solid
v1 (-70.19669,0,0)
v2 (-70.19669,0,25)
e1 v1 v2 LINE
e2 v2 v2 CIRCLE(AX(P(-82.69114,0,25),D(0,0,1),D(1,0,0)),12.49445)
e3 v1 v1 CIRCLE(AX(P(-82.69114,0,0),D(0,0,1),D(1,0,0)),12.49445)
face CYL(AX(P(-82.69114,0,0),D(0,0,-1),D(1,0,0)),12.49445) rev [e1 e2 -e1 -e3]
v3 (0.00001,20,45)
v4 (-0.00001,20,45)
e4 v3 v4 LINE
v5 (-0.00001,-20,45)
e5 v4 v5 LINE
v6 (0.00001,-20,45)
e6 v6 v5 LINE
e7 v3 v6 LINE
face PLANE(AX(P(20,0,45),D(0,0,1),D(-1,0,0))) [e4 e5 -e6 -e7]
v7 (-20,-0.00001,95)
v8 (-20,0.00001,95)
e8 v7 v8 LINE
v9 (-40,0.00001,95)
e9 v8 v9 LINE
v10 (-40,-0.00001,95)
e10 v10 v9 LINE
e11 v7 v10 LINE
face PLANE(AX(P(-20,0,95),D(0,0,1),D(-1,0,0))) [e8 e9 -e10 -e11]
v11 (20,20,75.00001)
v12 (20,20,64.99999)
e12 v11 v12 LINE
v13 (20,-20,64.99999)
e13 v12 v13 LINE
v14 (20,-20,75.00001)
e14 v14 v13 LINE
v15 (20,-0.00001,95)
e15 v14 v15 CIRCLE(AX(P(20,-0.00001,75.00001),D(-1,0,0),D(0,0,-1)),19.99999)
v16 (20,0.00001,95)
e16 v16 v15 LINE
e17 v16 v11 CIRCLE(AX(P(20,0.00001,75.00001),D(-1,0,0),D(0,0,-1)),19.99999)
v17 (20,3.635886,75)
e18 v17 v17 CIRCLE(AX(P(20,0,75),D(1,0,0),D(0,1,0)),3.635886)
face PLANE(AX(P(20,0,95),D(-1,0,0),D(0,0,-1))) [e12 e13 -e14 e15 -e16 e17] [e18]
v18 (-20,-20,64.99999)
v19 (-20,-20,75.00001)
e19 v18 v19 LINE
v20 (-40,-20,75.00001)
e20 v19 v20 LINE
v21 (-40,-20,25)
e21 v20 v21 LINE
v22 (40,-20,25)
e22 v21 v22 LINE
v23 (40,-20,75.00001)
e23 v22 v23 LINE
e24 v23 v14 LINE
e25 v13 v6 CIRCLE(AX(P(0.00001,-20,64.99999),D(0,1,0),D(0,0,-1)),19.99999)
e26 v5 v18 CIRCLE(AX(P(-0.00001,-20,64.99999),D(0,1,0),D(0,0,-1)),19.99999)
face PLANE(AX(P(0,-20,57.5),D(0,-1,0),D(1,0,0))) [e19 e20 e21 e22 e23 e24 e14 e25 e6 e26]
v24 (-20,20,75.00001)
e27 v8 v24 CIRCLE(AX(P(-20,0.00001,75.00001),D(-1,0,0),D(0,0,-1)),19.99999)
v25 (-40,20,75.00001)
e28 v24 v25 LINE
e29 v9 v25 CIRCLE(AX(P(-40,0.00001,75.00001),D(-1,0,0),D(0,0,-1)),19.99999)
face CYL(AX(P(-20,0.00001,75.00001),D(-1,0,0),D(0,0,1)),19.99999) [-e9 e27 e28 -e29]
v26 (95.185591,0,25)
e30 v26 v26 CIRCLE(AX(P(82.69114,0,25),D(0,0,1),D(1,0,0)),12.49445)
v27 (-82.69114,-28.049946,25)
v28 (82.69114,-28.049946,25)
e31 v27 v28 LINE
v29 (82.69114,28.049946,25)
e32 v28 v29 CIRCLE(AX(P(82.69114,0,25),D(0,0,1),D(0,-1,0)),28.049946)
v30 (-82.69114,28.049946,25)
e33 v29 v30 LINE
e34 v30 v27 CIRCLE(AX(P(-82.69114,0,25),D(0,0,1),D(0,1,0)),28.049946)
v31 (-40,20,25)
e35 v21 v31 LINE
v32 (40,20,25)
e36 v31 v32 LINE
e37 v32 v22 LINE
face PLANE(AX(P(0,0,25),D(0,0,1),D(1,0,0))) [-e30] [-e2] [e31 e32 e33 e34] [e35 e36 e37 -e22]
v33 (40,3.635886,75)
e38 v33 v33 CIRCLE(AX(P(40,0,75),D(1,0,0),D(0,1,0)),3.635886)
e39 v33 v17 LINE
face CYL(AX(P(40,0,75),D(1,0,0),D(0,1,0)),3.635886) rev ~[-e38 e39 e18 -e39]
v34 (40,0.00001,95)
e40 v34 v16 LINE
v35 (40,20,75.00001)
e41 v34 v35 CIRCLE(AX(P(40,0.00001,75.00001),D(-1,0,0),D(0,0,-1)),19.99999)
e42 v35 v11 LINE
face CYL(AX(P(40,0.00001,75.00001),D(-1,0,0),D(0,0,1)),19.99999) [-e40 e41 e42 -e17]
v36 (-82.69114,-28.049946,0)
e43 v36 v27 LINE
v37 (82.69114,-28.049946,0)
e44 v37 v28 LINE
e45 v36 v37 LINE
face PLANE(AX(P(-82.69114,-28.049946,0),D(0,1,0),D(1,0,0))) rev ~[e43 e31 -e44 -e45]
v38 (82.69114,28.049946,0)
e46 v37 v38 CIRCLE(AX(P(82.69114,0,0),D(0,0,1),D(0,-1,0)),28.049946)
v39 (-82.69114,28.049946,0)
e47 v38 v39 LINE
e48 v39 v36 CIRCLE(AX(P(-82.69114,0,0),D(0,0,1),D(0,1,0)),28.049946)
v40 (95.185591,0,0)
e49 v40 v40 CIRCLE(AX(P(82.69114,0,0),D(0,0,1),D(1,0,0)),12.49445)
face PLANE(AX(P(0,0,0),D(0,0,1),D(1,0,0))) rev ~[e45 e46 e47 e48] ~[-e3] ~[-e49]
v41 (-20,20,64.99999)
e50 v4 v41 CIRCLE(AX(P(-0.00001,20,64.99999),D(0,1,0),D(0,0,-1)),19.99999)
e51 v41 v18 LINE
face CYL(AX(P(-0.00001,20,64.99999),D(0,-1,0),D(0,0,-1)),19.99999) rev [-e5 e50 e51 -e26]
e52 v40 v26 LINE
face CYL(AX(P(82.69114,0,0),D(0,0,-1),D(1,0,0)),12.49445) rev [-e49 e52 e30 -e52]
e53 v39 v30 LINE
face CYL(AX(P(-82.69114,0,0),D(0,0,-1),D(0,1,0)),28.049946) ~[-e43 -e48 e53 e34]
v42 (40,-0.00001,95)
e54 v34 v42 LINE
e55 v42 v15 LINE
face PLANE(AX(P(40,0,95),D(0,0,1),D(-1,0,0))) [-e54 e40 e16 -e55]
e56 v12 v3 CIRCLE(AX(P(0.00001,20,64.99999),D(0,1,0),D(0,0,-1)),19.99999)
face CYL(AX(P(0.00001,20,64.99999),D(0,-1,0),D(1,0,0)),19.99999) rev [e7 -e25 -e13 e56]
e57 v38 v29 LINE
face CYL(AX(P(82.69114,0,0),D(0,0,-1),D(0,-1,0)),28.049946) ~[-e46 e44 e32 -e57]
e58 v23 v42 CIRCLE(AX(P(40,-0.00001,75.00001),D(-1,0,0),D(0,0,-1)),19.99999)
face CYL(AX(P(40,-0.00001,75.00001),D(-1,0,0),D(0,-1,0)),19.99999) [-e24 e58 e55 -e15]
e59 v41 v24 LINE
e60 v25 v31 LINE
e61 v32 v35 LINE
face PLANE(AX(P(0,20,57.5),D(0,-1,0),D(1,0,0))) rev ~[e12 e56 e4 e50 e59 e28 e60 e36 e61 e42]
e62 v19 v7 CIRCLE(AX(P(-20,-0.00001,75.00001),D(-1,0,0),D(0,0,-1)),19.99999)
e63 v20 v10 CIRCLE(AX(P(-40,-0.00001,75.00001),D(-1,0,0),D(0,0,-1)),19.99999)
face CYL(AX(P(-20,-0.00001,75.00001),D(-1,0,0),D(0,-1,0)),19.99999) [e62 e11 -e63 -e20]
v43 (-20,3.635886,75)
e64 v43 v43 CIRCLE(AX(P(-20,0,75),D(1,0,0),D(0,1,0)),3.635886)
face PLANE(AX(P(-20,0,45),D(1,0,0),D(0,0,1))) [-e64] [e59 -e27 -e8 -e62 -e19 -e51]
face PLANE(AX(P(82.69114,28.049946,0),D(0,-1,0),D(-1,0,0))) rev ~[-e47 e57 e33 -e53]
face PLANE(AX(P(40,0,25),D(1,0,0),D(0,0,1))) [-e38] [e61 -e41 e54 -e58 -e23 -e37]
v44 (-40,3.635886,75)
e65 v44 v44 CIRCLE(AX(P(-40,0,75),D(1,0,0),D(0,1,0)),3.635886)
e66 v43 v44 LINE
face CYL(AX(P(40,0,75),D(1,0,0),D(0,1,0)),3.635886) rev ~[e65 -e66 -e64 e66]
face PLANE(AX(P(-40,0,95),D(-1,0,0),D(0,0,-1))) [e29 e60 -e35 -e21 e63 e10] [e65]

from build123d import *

# Parameters (mm, degrees)
F0_R     = 12.4944504689
F1_DEPTH = 25
F3_DEPTH = 20
F4_R     = 19.99999
F5_R     = 19.99999
F6_R     = 3.63588552
F7_DEPTH = 150.7420863042


# Not quite as in the source:
# - a fillet or chamfer is up to 0.001 mm smaller than in the source, because OpenCascade refuses the exact size


with BuildPart() as f1:
    # F0 (on Top) → F1 (new body)
    with BuildSketch(Plane.XY):
        with BuildLine():
            Line((-82.6911404729, -28.0499458313), (82.6911404729, -28.0499458313))
            ThreePointArc((82.6911404729, -28.0499458313), (110.7410863042, 0), (82.6911404729, 28.0499458313))
            Line((82.6911404729, 28.0499458313), (-82.6911404729, 28.0499458313))
            ThreePointArc((-82.6911404729, 28.0499458313), (-110.7410863042, 0), (-82.6911404729, -28.0499458313))
        make_face()
        with Locations((-82.6911404729, 0)):
            Circle(F0_R, mode=Mode.SUBTRACT)
        with Locations((82.6911404729, 0)):
            Circle(F0_R, mode=Mode.SUBTRACT)
    extrude(amount=F1_DEPTH)

    # F2 (on Front) → F3 (join, symmetric)
    with BuildSketch(Plane.XZ):
        Polygon((-40, 25), (40, 25), (40, 95), (20, 95), (20, 45), (-20, 45), (-20, 95), (-40, 95), align=None)
    extrude(amount=F3_DEPTH, both=True)

    # F4 (radius 20 in the source; OpenCascade refuses exactly that, so slightly less here)
    f4_edges = [f1.edges().sort_by_distance(p)[0] for p in [
        (-20, 0, 45),
        (20, 0, 45),
    ]]
    fillet(f4_edges, radius=F4_R)

    # F5 (radius 20 in the source; OpenCascade refuses exactly that, so slightly less here)
    f5_edges = [f1.edges().sort_by_distance(p)[0] for p in [
        (-30, -20, 95),
        (-30, 20, 95),
        (30, -20, 95),
        (30, 20, 95),
    ]]
    fillet(f5_edges, radius=F5_R)

    # F6 (on face) → F7 (cut, through all)
    with BuildSketch(Plane.YZ.offset(40)):
        with Locations((0, 75)):
            Circle(F6_R)
    extrude(amount=-F7_DEPTH, mode=Mode.SUBTRACT)


solid = f1.part
